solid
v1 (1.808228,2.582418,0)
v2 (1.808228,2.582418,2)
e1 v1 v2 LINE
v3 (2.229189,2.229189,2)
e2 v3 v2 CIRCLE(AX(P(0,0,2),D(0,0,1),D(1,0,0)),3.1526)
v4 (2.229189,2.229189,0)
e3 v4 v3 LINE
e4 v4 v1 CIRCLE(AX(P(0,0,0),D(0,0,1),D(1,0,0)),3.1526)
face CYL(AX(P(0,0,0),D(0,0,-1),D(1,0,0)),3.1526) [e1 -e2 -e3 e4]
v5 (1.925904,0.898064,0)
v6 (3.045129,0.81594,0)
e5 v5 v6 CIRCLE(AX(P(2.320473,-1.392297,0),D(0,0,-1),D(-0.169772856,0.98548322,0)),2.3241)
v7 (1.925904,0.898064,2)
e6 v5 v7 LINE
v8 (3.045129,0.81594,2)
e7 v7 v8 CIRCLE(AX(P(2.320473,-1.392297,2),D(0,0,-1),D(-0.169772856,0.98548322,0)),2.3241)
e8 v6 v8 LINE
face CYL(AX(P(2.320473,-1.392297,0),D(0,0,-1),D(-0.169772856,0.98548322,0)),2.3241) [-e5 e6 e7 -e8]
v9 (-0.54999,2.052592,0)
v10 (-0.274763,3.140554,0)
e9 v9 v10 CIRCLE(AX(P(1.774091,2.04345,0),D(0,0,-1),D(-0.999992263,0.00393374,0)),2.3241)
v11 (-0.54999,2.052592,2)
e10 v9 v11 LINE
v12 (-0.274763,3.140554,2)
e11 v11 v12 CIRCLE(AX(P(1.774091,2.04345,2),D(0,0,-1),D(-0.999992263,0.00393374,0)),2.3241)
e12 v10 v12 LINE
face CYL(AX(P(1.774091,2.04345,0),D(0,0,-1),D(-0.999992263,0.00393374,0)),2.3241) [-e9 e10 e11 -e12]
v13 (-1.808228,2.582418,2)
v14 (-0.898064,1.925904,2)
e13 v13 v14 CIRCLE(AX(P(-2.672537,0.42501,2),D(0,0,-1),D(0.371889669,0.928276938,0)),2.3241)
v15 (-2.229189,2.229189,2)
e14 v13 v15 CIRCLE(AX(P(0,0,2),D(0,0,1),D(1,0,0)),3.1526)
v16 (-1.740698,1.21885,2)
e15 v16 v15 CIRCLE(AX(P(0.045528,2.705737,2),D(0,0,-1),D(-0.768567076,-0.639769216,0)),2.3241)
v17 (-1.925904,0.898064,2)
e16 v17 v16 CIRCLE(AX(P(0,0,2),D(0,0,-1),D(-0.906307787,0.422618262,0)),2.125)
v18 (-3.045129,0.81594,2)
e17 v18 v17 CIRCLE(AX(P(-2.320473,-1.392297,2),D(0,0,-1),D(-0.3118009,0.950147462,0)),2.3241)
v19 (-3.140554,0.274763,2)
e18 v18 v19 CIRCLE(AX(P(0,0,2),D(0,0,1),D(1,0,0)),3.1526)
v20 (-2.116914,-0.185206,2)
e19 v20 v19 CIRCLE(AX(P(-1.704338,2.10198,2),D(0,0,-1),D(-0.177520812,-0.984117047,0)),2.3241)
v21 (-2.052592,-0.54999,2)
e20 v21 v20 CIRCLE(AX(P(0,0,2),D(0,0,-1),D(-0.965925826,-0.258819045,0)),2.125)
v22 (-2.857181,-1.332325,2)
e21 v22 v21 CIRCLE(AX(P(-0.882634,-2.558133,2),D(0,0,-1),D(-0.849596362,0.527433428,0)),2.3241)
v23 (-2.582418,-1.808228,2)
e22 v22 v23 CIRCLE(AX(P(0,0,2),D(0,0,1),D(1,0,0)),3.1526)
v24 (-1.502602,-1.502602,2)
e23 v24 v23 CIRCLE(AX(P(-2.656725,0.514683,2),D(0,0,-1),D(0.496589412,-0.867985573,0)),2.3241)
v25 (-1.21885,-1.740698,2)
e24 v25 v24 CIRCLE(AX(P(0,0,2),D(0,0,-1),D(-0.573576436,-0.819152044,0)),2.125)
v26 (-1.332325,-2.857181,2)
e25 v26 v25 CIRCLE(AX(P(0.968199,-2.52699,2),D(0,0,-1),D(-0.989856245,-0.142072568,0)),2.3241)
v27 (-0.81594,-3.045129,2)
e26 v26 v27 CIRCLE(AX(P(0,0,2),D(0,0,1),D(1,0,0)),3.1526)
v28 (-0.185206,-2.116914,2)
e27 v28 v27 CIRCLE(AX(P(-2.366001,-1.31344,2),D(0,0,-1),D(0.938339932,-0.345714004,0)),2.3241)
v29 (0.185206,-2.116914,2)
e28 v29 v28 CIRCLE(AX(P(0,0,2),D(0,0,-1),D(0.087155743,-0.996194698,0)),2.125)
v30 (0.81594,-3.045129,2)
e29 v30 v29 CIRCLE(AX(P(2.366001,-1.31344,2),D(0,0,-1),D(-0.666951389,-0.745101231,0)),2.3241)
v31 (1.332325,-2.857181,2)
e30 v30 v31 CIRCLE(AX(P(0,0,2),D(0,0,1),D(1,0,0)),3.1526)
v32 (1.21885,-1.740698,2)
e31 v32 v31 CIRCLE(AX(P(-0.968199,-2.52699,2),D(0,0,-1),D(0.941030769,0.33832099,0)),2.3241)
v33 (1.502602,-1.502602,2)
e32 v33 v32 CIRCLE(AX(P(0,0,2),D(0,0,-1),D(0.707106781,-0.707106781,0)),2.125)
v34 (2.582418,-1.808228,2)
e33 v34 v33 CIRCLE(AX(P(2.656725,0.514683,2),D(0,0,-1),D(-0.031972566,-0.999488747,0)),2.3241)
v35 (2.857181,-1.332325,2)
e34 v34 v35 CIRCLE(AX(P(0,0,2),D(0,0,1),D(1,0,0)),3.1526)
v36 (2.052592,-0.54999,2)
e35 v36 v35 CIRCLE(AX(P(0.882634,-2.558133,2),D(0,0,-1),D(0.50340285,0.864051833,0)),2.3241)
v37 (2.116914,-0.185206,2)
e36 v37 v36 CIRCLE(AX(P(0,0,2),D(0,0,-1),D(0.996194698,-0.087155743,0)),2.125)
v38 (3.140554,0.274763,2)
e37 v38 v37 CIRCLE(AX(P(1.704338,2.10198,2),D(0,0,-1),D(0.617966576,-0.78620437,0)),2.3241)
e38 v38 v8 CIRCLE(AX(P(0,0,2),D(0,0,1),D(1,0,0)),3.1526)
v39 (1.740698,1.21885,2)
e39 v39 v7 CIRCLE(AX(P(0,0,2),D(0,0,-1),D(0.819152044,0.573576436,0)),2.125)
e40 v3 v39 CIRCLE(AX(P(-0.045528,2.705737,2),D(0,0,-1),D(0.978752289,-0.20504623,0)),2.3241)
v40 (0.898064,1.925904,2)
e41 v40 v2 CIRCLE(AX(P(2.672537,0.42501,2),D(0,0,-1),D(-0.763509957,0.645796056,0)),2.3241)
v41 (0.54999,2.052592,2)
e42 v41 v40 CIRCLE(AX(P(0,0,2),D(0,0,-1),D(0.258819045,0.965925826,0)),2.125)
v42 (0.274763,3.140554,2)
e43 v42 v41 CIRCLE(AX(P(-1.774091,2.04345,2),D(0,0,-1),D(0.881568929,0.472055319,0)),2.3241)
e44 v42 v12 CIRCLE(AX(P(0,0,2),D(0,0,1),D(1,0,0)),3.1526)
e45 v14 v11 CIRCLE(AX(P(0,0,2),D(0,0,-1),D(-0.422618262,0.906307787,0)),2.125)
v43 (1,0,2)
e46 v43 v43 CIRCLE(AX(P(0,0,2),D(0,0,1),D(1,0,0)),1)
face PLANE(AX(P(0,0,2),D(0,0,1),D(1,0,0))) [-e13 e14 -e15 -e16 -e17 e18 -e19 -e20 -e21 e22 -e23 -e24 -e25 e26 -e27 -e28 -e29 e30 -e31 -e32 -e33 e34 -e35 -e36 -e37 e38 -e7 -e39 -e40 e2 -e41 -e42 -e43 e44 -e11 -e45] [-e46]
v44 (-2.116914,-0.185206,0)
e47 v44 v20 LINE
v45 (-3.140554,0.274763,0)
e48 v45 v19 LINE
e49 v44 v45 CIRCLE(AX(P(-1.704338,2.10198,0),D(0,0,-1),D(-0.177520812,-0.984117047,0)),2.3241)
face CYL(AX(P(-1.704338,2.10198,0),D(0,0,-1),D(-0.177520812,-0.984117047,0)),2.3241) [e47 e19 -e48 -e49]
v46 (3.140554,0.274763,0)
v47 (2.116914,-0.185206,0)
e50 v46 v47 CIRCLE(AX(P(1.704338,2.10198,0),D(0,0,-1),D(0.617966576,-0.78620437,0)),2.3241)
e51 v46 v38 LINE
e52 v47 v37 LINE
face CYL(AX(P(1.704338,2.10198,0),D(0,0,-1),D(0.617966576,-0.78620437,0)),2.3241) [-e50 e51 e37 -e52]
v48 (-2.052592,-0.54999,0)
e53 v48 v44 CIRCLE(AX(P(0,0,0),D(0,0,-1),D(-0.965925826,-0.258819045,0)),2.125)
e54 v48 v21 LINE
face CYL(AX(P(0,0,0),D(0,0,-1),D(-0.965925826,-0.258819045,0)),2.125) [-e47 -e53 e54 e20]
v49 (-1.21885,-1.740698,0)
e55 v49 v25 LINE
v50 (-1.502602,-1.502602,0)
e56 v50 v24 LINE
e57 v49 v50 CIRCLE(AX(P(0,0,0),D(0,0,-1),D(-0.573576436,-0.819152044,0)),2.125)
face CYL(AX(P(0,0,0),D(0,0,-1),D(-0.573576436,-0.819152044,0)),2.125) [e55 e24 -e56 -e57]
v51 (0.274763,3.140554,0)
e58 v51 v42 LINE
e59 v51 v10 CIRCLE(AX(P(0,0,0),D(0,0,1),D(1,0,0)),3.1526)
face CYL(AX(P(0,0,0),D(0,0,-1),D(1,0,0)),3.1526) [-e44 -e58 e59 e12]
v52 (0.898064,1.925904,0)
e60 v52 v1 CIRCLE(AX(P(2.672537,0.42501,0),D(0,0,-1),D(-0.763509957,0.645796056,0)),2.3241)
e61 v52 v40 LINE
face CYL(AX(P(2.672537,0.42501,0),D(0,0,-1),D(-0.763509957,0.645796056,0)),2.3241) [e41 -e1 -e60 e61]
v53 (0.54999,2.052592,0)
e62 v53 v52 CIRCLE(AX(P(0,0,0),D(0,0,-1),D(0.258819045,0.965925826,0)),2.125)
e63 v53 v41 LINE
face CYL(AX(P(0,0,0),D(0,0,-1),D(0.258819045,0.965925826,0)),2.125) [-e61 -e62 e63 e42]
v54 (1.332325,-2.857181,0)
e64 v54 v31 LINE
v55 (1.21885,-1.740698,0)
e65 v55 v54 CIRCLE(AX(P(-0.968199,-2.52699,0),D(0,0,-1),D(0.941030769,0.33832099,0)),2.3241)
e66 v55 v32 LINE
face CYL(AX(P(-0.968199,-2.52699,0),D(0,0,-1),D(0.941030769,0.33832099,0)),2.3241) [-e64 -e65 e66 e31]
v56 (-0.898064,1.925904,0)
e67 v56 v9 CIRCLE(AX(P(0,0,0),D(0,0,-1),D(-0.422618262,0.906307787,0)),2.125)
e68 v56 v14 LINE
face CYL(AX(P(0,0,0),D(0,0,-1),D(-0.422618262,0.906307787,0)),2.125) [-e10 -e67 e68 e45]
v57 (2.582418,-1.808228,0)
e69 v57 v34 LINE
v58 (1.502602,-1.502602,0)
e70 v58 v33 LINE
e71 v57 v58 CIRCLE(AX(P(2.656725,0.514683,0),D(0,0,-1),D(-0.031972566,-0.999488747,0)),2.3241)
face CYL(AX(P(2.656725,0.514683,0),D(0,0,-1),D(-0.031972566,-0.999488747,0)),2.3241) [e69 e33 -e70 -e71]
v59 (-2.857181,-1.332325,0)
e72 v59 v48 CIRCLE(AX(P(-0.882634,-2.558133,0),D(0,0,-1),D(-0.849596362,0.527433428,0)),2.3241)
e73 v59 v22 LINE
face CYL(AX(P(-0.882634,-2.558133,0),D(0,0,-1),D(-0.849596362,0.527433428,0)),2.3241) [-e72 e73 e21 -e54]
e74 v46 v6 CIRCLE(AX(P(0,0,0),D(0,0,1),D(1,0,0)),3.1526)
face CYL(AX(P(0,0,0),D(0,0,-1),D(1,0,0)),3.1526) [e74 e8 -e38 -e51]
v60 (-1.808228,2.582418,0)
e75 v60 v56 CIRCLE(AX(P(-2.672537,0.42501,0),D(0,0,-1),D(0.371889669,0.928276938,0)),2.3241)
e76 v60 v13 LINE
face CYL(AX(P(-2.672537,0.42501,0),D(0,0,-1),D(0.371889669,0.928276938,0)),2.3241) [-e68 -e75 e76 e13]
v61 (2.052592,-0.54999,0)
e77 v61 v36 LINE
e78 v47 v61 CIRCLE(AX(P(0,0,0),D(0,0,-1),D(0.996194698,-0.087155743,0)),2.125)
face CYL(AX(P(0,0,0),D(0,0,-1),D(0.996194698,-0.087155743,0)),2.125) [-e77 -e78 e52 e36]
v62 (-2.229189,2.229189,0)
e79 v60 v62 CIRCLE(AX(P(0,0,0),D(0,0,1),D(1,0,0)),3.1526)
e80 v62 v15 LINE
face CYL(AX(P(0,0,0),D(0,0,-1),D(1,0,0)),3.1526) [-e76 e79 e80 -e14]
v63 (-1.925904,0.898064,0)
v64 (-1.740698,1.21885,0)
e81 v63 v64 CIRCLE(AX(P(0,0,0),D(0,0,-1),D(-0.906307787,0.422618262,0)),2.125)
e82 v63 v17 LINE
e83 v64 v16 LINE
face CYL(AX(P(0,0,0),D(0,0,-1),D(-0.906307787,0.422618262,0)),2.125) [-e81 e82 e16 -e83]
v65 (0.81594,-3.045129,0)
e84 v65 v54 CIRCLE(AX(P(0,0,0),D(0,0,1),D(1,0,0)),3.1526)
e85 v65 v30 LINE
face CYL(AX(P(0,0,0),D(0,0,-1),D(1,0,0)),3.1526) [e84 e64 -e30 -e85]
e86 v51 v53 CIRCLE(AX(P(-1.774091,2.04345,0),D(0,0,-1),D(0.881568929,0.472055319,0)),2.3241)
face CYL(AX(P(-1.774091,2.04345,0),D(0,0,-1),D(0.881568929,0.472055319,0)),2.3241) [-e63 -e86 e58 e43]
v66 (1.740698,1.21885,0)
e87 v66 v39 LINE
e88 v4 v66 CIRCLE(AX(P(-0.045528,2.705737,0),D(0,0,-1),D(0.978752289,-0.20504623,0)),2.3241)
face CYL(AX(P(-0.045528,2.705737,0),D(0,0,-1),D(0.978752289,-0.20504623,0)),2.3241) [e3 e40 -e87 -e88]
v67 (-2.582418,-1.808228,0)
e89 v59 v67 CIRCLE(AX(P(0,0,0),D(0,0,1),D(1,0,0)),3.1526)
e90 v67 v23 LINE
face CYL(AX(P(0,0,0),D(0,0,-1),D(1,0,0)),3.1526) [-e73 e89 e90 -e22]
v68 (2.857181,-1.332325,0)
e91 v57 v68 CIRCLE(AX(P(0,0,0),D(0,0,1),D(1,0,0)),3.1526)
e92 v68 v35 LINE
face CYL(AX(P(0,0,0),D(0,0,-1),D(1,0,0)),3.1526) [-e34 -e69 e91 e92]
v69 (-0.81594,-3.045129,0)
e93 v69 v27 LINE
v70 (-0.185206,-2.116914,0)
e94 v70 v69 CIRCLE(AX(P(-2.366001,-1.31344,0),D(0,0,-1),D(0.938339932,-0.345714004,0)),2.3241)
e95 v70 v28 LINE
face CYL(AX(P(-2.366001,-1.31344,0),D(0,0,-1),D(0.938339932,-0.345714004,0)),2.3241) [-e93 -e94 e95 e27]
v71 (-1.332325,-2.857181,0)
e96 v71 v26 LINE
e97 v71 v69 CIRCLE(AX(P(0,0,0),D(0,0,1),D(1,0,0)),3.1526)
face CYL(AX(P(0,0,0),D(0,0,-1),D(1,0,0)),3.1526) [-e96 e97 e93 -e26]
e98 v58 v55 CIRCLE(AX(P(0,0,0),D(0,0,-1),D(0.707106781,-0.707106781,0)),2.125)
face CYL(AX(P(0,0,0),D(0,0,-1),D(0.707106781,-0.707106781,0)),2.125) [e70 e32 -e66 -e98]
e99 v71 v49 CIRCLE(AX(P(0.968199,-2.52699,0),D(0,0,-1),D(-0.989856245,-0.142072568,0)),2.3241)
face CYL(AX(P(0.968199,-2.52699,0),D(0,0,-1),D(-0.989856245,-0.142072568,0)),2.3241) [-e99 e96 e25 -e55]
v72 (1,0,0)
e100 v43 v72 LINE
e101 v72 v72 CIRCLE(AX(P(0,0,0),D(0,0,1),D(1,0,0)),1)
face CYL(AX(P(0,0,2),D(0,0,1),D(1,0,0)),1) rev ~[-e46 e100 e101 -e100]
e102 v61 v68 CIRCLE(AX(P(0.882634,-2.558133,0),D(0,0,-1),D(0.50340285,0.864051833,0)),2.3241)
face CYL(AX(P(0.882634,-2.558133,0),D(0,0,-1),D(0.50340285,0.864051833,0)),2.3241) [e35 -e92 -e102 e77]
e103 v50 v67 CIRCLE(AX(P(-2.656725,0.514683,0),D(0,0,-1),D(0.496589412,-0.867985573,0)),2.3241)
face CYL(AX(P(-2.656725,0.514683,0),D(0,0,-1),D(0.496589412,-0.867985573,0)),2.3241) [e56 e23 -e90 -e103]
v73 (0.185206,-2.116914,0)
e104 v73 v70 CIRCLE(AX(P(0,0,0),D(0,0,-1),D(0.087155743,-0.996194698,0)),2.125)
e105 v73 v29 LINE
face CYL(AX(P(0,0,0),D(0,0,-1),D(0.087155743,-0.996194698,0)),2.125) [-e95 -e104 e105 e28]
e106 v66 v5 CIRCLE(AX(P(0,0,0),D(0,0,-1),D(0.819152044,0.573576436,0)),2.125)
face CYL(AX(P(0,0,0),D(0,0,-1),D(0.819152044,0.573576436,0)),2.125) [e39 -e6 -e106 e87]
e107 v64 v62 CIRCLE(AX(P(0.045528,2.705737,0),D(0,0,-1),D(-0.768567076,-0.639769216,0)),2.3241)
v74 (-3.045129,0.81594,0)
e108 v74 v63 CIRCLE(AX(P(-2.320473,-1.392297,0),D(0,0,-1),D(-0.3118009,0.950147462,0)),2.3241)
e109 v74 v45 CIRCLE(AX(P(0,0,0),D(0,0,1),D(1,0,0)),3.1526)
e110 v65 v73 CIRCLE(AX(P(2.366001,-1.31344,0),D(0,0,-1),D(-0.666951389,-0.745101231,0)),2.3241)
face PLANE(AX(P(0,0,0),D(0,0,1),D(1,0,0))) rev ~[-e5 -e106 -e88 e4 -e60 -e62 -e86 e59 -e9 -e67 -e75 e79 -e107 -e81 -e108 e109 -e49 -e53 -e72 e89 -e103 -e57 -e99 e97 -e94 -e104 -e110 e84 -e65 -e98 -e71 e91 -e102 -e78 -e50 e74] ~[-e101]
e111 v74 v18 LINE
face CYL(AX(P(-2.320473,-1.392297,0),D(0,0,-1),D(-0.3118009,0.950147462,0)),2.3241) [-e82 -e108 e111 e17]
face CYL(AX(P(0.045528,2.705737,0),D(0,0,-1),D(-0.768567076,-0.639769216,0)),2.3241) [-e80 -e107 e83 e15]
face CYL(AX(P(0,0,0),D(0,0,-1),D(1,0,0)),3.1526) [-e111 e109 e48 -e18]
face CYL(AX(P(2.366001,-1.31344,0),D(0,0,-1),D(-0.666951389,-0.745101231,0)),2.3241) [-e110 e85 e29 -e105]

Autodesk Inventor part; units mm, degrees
sketch "Sketch1" plane through (0, 0, 0) normal (0, 0, 1) x (1, 0, 0)
  circle A0 centre (0, 0) radius 3.1526
  dimension "d0" = 6.3051
extrude "Extrusion1" add sketch "Sketch1" along normal blind 2
ref_plane "Work Plane2" through (0, 0, 1) normal (0, 0, 1) x (1, 0, 0)
sketch "Sketch2" plane through (0, 0, 0) normal (0, 0, -1) x (-1, 0, 0)
  circle A0 centre (0, 0) radius 3.1526 projected
  circle A1 centre (0, 0) radius 2.25
  dimension "d3" = 4.5
surface extrude "Pitch Diameter" sketch "Sketch2" against normal through all shown no curves A1
ref_plane "Work Plane8" through (0, 0, 0) normal (0.9396926, 0.3420201, 0) x (0, 0, 1)
ref_plane "Work Plane9" through (0, 0, 0) normal (1, 0, 0) x (0, 1, 0)
spur gear teeth "Spur Gear" teeth 9 pitch diameter 4.5 tip diameter 6.3051 root diameter 4.25 face width 2 start plane through (0, 0, 0) normal (0, 0, -1) x (-1, 0, 0)
sketch "Sketch3" plane through (0, 0, 2) normal (0, 0, 1) x (1, 0, 0)
  circle A0 centre (0, 0) radius 1
  dimension "d49" = 2
extrude "Extrusion2" cut sketch "Sketch3" against normal up to surface (2 mm away)
equation "\"d0\" = da_da"
equation "\"d1\" = da_b"
equation "\"d3\" = da_d"
equation "\"d16\" = da_aw"
equation "\"d43\" = da_aw"
equation "\"d46\" = da_aw"
equation "\"da_da\" = 6.305131"
equation "\"da_b\" = 2"
equation "\"da_d\" = 4.5"
equation "\"da_aw\" = 14.951817"
properties part number "Spur Gear2" material "Steel"
